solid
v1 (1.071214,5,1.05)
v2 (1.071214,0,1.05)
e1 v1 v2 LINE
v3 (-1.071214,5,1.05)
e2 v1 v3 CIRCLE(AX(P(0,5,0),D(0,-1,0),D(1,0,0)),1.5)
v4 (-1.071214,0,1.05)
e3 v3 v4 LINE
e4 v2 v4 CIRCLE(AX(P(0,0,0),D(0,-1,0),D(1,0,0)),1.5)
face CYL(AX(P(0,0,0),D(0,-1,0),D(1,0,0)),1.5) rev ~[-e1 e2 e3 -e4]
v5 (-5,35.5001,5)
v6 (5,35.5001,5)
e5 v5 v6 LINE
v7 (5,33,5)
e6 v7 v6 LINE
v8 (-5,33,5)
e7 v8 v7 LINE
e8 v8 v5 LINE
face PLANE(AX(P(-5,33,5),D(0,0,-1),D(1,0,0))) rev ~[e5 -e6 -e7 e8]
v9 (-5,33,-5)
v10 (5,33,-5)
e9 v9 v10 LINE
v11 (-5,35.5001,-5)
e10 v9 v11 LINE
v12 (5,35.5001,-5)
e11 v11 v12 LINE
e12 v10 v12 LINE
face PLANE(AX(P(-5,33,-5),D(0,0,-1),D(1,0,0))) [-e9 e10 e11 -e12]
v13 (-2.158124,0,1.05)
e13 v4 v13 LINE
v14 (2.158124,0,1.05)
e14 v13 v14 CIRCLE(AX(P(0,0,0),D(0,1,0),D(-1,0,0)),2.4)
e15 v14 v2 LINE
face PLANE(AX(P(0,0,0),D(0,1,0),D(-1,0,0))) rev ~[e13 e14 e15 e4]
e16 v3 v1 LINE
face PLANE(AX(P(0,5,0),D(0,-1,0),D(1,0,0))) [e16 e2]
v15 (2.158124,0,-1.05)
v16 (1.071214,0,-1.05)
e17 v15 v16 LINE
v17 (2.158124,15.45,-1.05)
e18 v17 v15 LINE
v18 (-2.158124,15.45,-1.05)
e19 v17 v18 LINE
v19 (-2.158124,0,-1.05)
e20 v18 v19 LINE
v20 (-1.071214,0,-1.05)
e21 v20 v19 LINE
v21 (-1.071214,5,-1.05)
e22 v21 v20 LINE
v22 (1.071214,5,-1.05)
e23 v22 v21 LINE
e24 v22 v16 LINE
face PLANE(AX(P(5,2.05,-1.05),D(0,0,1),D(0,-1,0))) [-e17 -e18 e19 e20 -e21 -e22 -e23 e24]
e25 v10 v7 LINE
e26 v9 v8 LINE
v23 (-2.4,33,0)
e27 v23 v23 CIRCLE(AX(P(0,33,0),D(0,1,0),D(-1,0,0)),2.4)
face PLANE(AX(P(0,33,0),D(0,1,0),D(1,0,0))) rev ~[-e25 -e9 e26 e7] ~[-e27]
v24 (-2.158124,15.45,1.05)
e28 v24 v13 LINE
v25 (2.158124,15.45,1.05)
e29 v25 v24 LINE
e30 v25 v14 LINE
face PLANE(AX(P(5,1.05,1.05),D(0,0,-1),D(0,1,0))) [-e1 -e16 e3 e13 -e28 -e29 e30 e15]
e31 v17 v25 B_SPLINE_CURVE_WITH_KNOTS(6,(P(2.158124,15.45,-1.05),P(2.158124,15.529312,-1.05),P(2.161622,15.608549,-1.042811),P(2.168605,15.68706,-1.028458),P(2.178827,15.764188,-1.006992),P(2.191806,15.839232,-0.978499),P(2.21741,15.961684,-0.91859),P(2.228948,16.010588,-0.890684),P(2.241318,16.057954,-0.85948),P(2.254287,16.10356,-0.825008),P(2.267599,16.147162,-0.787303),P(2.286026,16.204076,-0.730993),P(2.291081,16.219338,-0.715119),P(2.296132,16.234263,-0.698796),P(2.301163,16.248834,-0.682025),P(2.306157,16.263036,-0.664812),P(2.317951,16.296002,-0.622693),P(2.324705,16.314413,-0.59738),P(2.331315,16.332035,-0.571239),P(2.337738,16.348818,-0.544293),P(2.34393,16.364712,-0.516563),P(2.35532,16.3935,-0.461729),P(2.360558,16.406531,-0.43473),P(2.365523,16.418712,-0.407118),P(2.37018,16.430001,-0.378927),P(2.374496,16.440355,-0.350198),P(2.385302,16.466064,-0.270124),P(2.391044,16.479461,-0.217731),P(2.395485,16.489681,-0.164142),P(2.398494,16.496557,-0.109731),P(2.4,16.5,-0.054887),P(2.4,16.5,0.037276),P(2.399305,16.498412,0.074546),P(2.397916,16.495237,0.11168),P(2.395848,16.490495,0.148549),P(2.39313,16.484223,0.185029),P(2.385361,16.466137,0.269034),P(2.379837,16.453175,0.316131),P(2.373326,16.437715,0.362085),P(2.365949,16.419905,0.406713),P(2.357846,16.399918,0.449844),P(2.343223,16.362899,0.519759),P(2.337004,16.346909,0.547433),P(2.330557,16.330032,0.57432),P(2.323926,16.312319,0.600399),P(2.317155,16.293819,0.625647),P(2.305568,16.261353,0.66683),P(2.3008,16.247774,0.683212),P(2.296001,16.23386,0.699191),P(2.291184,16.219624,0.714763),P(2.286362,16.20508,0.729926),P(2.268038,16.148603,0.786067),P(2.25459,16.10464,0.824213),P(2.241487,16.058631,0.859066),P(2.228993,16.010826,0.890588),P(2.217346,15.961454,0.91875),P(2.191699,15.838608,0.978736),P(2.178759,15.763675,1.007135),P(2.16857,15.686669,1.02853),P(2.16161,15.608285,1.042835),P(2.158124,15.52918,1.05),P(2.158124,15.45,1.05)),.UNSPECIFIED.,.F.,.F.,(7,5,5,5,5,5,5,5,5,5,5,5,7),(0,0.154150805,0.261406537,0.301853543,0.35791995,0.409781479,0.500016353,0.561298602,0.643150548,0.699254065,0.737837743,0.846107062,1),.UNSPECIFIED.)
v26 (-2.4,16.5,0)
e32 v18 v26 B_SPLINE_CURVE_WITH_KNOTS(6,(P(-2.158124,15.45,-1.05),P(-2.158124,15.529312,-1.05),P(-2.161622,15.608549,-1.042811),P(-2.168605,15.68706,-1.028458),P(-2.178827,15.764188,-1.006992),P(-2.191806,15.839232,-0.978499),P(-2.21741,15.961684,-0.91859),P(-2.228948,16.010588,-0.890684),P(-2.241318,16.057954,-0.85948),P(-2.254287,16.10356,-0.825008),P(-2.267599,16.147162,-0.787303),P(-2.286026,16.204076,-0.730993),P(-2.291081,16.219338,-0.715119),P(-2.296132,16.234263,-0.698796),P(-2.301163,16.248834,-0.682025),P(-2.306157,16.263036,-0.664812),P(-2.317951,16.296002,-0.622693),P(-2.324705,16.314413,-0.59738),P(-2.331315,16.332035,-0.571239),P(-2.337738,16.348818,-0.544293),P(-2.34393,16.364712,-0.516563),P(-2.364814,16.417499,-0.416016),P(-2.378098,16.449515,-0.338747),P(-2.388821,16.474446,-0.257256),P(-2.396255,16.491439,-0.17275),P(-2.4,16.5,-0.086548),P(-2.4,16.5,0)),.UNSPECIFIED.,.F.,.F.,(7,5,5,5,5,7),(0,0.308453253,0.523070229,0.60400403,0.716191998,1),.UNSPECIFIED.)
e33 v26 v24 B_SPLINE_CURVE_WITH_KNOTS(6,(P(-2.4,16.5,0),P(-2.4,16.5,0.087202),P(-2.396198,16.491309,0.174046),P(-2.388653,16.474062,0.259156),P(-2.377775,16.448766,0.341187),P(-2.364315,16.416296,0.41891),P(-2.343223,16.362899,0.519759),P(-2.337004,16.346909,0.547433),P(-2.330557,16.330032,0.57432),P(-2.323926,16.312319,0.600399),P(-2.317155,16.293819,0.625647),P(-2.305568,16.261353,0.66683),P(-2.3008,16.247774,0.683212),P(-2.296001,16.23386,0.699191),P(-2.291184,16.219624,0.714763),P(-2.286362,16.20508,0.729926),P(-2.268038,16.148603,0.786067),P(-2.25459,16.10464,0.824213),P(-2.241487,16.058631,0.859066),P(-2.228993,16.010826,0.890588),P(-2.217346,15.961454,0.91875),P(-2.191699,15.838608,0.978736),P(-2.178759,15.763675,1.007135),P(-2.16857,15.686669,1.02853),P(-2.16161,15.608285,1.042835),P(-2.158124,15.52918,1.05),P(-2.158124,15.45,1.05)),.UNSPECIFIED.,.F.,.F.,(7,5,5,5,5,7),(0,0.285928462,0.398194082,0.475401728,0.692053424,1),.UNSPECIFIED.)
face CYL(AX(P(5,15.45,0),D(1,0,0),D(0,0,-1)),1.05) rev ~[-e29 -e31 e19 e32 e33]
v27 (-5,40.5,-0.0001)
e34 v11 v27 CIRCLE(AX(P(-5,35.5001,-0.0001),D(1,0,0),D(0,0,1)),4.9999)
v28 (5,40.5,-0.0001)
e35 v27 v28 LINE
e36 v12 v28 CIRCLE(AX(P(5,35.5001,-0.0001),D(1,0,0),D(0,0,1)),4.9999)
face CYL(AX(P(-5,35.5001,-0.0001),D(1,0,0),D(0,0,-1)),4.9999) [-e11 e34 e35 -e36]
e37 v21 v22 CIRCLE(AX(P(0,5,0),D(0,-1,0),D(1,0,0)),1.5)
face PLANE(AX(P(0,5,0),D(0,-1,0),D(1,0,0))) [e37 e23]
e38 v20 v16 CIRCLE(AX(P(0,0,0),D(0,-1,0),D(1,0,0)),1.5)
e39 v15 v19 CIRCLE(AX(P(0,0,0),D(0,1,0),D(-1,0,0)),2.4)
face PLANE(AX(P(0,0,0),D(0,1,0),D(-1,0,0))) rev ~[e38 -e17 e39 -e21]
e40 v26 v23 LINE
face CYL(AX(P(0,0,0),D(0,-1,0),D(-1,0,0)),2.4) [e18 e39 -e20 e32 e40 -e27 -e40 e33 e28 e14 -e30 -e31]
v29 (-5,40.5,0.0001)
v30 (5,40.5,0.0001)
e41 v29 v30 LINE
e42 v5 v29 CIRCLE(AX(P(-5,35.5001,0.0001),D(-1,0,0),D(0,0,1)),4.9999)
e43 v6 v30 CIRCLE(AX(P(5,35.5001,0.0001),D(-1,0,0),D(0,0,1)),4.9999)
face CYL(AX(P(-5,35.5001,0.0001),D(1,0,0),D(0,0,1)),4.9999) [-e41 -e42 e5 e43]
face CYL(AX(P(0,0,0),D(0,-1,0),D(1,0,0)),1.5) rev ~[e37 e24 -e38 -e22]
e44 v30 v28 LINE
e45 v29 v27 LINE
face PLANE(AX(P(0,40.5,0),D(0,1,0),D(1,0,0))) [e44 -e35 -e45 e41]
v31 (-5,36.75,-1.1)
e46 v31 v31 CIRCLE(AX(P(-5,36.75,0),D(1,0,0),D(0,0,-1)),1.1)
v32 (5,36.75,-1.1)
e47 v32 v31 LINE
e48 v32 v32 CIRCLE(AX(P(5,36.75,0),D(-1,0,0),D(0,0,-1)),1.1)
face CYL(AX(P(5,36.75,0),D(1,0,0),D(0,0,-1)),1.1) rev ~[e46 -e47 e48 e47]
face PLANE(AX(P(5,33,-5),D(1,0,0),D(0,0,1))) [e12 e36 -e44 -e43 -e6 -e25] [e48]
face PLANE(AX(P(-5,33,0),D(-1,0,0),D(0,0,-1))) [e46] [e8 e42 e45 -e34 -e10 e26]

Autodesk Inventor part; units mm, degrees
ref_plane "YZ Plane" through (0, 0, 0) normal (1, 0, 0) x (0, 1, 0)
ref_plane "XZ Plane" through (0, 0, 0) normal (0, 1, 0) x (-1, 0, 0)
ref_plane "XY Plane" through (0, 0, 0) normal (0, 0, 1) x (1, 0, 0)
sketch "Sketch1" plane through (0, 0, 0) normal (0, 1, 0) x (-1, 0, 0)
  circle A0 centre (0, 0) radius 2.4
  dimension "d0" = 4.8
extrude "Extrusion1" add sketch "Sketch1" along normal blind 33
sketch "Sketch2" plane through (0, 33, 0) normal (0, 1, 0) x (1, 0, 0)
  line L0 (-5, 0) -> (5, 0)
  line L1 (-5, 0) -> (-5, -5)
  line L2 (-5, -5) -> (5, -5)
  line L3 (5, -5) -> (5, 0)
  line L4 (-5, 0) -> (-5, 5)
  line L5 (-5, 5) -> (5, 5)
  line L6 (5, 5) -> (5, 0)
  point P0 (0, 0)
  dimension "d4" = 10
  dimension "d5" = 5
  dimension "d6" = 5
extrude "Extrusion2" add sketch "Sketch2" along normal blind 7.5
fillet "Fillet1" radius 5 2 edges at (0, 40.5, 5) (0, 40.5, -5)
sketch "Sketch3" plane through (5, 33, 5) normal (1, 0, 0) x (0, 0, -1)
  line L0 (10, 0) -> (0, 0) projected
  line L1 (5, 0) -> (5, 7.5)
  arc A0 (10, 2.5) -> (0, 2.5) centre (5, 2.5) ccw projected
  line L2 (5, 0) -> (5, 3.75)
  circle A1 centre (5, 3.75) radius 1.1
  point P0 (5, -33)
  dimension "d10" = 2.2
extrude "Extrusion3" cut sketch "Sketch3" against normal through all
sketch "Sketch5" plane through (0, 0, 0) normal (0, -1, 0) x (1, 0, 0)
  circle A0 centre (0, 0) radius 2.4
  circle A1 centre (0, 0) radius 1.5
  dimension "d19" = 3
extrude "Extrusion5" cut sketch "Sketch5" against normal blind 5 contours A1
sketch "Sketch6" plane through (5, 33, 5) normal (1, 0, 0) x (0, 0, -1)
  line L0 (5, -33) -> (5, -32)
  line L1 (5, -32) -> (5, -24)
  line L2 (5, -24) -> (5, -32) construction
  line L3 (3.95, -25.05) -> (3.95, -30.95)
  line L4 (6.05, -30.95) -> (6.05, -25.05)
  arc A0 (6.05, -25.05) -> (3.95, -25.05) centre (5, -25.05) ccw
  arc A1 (3.95, -30.95) -> (6.05, -30.95) centre (5, -30.95) ccw
  line L5 (5, -33) -> (5, -24) construction
  line L6 (7.4, -33) -> (2.6, -33) projected
  line L7 (3.95, -31.95) -> (3.95, -25.05)
  line L8 (6.05, -25.05) -> (6.05, -31.95)
  arc A2 (3.95, -31.95) -> (6.05, -31.95) centre (5, -31.95) ccw
  arc A3 (6.05, -25.05) -> (3.95, -25.05) centre (5, -25.05) ccw
  line L9 (3.95, -31.95) -> (3.95, -33)
  line L10 (6.05, -31.95) -> (6.05, -33)
  line L11 (3.95, -33) -> (6.05, -33)
  line L12 (5, -24) -> (5, 0)
  line L13 (7.4, 0) -> (2.6, 0) projected
  line L14 (5, 0) -> (5, -33)
  line L15 (5, -16.5) -> (7.4, -16.5)
  line L16 (7.4, -33) -> (7.4, 0) projected
  line L17 (5, -16.5) -> (5, -28) construction
  line L18 (3.95, -17.55) -> (3.95, -26.95)
  line L19 (6.05, -26.95) -> (6.05, -17.55)
  arc A4 (6.05, -17.55) -> (3.95, -17.55) centre (5, -17.55) ccw
  arc A5 (3.95, -26.95) -> (6.05, -26.95) centre (5, -26.95) ccw
  point P0 (5, -28.5)
  point P1 (6.05, -30.95)
  point P2 (5, -22.25)
  dimension "d22" = 1
  dimension "d23" = 8
  dimension "d24" = 2.1
extrude "Extrusion6" cut sketch "Sketch6" against normal through all contours A2 L7 A1 L0 | A2 L10 L6 | L6 L9 A2 | L0 A1 L8 A2 | A1 L3 A5 L1 | L1 A5 L4 A1 | A5 L3 A0 L1 | L1 A0 L4 A5 | L12 A4 L19 A0 | A0 L18 A4 L12
properties part number "pist"
